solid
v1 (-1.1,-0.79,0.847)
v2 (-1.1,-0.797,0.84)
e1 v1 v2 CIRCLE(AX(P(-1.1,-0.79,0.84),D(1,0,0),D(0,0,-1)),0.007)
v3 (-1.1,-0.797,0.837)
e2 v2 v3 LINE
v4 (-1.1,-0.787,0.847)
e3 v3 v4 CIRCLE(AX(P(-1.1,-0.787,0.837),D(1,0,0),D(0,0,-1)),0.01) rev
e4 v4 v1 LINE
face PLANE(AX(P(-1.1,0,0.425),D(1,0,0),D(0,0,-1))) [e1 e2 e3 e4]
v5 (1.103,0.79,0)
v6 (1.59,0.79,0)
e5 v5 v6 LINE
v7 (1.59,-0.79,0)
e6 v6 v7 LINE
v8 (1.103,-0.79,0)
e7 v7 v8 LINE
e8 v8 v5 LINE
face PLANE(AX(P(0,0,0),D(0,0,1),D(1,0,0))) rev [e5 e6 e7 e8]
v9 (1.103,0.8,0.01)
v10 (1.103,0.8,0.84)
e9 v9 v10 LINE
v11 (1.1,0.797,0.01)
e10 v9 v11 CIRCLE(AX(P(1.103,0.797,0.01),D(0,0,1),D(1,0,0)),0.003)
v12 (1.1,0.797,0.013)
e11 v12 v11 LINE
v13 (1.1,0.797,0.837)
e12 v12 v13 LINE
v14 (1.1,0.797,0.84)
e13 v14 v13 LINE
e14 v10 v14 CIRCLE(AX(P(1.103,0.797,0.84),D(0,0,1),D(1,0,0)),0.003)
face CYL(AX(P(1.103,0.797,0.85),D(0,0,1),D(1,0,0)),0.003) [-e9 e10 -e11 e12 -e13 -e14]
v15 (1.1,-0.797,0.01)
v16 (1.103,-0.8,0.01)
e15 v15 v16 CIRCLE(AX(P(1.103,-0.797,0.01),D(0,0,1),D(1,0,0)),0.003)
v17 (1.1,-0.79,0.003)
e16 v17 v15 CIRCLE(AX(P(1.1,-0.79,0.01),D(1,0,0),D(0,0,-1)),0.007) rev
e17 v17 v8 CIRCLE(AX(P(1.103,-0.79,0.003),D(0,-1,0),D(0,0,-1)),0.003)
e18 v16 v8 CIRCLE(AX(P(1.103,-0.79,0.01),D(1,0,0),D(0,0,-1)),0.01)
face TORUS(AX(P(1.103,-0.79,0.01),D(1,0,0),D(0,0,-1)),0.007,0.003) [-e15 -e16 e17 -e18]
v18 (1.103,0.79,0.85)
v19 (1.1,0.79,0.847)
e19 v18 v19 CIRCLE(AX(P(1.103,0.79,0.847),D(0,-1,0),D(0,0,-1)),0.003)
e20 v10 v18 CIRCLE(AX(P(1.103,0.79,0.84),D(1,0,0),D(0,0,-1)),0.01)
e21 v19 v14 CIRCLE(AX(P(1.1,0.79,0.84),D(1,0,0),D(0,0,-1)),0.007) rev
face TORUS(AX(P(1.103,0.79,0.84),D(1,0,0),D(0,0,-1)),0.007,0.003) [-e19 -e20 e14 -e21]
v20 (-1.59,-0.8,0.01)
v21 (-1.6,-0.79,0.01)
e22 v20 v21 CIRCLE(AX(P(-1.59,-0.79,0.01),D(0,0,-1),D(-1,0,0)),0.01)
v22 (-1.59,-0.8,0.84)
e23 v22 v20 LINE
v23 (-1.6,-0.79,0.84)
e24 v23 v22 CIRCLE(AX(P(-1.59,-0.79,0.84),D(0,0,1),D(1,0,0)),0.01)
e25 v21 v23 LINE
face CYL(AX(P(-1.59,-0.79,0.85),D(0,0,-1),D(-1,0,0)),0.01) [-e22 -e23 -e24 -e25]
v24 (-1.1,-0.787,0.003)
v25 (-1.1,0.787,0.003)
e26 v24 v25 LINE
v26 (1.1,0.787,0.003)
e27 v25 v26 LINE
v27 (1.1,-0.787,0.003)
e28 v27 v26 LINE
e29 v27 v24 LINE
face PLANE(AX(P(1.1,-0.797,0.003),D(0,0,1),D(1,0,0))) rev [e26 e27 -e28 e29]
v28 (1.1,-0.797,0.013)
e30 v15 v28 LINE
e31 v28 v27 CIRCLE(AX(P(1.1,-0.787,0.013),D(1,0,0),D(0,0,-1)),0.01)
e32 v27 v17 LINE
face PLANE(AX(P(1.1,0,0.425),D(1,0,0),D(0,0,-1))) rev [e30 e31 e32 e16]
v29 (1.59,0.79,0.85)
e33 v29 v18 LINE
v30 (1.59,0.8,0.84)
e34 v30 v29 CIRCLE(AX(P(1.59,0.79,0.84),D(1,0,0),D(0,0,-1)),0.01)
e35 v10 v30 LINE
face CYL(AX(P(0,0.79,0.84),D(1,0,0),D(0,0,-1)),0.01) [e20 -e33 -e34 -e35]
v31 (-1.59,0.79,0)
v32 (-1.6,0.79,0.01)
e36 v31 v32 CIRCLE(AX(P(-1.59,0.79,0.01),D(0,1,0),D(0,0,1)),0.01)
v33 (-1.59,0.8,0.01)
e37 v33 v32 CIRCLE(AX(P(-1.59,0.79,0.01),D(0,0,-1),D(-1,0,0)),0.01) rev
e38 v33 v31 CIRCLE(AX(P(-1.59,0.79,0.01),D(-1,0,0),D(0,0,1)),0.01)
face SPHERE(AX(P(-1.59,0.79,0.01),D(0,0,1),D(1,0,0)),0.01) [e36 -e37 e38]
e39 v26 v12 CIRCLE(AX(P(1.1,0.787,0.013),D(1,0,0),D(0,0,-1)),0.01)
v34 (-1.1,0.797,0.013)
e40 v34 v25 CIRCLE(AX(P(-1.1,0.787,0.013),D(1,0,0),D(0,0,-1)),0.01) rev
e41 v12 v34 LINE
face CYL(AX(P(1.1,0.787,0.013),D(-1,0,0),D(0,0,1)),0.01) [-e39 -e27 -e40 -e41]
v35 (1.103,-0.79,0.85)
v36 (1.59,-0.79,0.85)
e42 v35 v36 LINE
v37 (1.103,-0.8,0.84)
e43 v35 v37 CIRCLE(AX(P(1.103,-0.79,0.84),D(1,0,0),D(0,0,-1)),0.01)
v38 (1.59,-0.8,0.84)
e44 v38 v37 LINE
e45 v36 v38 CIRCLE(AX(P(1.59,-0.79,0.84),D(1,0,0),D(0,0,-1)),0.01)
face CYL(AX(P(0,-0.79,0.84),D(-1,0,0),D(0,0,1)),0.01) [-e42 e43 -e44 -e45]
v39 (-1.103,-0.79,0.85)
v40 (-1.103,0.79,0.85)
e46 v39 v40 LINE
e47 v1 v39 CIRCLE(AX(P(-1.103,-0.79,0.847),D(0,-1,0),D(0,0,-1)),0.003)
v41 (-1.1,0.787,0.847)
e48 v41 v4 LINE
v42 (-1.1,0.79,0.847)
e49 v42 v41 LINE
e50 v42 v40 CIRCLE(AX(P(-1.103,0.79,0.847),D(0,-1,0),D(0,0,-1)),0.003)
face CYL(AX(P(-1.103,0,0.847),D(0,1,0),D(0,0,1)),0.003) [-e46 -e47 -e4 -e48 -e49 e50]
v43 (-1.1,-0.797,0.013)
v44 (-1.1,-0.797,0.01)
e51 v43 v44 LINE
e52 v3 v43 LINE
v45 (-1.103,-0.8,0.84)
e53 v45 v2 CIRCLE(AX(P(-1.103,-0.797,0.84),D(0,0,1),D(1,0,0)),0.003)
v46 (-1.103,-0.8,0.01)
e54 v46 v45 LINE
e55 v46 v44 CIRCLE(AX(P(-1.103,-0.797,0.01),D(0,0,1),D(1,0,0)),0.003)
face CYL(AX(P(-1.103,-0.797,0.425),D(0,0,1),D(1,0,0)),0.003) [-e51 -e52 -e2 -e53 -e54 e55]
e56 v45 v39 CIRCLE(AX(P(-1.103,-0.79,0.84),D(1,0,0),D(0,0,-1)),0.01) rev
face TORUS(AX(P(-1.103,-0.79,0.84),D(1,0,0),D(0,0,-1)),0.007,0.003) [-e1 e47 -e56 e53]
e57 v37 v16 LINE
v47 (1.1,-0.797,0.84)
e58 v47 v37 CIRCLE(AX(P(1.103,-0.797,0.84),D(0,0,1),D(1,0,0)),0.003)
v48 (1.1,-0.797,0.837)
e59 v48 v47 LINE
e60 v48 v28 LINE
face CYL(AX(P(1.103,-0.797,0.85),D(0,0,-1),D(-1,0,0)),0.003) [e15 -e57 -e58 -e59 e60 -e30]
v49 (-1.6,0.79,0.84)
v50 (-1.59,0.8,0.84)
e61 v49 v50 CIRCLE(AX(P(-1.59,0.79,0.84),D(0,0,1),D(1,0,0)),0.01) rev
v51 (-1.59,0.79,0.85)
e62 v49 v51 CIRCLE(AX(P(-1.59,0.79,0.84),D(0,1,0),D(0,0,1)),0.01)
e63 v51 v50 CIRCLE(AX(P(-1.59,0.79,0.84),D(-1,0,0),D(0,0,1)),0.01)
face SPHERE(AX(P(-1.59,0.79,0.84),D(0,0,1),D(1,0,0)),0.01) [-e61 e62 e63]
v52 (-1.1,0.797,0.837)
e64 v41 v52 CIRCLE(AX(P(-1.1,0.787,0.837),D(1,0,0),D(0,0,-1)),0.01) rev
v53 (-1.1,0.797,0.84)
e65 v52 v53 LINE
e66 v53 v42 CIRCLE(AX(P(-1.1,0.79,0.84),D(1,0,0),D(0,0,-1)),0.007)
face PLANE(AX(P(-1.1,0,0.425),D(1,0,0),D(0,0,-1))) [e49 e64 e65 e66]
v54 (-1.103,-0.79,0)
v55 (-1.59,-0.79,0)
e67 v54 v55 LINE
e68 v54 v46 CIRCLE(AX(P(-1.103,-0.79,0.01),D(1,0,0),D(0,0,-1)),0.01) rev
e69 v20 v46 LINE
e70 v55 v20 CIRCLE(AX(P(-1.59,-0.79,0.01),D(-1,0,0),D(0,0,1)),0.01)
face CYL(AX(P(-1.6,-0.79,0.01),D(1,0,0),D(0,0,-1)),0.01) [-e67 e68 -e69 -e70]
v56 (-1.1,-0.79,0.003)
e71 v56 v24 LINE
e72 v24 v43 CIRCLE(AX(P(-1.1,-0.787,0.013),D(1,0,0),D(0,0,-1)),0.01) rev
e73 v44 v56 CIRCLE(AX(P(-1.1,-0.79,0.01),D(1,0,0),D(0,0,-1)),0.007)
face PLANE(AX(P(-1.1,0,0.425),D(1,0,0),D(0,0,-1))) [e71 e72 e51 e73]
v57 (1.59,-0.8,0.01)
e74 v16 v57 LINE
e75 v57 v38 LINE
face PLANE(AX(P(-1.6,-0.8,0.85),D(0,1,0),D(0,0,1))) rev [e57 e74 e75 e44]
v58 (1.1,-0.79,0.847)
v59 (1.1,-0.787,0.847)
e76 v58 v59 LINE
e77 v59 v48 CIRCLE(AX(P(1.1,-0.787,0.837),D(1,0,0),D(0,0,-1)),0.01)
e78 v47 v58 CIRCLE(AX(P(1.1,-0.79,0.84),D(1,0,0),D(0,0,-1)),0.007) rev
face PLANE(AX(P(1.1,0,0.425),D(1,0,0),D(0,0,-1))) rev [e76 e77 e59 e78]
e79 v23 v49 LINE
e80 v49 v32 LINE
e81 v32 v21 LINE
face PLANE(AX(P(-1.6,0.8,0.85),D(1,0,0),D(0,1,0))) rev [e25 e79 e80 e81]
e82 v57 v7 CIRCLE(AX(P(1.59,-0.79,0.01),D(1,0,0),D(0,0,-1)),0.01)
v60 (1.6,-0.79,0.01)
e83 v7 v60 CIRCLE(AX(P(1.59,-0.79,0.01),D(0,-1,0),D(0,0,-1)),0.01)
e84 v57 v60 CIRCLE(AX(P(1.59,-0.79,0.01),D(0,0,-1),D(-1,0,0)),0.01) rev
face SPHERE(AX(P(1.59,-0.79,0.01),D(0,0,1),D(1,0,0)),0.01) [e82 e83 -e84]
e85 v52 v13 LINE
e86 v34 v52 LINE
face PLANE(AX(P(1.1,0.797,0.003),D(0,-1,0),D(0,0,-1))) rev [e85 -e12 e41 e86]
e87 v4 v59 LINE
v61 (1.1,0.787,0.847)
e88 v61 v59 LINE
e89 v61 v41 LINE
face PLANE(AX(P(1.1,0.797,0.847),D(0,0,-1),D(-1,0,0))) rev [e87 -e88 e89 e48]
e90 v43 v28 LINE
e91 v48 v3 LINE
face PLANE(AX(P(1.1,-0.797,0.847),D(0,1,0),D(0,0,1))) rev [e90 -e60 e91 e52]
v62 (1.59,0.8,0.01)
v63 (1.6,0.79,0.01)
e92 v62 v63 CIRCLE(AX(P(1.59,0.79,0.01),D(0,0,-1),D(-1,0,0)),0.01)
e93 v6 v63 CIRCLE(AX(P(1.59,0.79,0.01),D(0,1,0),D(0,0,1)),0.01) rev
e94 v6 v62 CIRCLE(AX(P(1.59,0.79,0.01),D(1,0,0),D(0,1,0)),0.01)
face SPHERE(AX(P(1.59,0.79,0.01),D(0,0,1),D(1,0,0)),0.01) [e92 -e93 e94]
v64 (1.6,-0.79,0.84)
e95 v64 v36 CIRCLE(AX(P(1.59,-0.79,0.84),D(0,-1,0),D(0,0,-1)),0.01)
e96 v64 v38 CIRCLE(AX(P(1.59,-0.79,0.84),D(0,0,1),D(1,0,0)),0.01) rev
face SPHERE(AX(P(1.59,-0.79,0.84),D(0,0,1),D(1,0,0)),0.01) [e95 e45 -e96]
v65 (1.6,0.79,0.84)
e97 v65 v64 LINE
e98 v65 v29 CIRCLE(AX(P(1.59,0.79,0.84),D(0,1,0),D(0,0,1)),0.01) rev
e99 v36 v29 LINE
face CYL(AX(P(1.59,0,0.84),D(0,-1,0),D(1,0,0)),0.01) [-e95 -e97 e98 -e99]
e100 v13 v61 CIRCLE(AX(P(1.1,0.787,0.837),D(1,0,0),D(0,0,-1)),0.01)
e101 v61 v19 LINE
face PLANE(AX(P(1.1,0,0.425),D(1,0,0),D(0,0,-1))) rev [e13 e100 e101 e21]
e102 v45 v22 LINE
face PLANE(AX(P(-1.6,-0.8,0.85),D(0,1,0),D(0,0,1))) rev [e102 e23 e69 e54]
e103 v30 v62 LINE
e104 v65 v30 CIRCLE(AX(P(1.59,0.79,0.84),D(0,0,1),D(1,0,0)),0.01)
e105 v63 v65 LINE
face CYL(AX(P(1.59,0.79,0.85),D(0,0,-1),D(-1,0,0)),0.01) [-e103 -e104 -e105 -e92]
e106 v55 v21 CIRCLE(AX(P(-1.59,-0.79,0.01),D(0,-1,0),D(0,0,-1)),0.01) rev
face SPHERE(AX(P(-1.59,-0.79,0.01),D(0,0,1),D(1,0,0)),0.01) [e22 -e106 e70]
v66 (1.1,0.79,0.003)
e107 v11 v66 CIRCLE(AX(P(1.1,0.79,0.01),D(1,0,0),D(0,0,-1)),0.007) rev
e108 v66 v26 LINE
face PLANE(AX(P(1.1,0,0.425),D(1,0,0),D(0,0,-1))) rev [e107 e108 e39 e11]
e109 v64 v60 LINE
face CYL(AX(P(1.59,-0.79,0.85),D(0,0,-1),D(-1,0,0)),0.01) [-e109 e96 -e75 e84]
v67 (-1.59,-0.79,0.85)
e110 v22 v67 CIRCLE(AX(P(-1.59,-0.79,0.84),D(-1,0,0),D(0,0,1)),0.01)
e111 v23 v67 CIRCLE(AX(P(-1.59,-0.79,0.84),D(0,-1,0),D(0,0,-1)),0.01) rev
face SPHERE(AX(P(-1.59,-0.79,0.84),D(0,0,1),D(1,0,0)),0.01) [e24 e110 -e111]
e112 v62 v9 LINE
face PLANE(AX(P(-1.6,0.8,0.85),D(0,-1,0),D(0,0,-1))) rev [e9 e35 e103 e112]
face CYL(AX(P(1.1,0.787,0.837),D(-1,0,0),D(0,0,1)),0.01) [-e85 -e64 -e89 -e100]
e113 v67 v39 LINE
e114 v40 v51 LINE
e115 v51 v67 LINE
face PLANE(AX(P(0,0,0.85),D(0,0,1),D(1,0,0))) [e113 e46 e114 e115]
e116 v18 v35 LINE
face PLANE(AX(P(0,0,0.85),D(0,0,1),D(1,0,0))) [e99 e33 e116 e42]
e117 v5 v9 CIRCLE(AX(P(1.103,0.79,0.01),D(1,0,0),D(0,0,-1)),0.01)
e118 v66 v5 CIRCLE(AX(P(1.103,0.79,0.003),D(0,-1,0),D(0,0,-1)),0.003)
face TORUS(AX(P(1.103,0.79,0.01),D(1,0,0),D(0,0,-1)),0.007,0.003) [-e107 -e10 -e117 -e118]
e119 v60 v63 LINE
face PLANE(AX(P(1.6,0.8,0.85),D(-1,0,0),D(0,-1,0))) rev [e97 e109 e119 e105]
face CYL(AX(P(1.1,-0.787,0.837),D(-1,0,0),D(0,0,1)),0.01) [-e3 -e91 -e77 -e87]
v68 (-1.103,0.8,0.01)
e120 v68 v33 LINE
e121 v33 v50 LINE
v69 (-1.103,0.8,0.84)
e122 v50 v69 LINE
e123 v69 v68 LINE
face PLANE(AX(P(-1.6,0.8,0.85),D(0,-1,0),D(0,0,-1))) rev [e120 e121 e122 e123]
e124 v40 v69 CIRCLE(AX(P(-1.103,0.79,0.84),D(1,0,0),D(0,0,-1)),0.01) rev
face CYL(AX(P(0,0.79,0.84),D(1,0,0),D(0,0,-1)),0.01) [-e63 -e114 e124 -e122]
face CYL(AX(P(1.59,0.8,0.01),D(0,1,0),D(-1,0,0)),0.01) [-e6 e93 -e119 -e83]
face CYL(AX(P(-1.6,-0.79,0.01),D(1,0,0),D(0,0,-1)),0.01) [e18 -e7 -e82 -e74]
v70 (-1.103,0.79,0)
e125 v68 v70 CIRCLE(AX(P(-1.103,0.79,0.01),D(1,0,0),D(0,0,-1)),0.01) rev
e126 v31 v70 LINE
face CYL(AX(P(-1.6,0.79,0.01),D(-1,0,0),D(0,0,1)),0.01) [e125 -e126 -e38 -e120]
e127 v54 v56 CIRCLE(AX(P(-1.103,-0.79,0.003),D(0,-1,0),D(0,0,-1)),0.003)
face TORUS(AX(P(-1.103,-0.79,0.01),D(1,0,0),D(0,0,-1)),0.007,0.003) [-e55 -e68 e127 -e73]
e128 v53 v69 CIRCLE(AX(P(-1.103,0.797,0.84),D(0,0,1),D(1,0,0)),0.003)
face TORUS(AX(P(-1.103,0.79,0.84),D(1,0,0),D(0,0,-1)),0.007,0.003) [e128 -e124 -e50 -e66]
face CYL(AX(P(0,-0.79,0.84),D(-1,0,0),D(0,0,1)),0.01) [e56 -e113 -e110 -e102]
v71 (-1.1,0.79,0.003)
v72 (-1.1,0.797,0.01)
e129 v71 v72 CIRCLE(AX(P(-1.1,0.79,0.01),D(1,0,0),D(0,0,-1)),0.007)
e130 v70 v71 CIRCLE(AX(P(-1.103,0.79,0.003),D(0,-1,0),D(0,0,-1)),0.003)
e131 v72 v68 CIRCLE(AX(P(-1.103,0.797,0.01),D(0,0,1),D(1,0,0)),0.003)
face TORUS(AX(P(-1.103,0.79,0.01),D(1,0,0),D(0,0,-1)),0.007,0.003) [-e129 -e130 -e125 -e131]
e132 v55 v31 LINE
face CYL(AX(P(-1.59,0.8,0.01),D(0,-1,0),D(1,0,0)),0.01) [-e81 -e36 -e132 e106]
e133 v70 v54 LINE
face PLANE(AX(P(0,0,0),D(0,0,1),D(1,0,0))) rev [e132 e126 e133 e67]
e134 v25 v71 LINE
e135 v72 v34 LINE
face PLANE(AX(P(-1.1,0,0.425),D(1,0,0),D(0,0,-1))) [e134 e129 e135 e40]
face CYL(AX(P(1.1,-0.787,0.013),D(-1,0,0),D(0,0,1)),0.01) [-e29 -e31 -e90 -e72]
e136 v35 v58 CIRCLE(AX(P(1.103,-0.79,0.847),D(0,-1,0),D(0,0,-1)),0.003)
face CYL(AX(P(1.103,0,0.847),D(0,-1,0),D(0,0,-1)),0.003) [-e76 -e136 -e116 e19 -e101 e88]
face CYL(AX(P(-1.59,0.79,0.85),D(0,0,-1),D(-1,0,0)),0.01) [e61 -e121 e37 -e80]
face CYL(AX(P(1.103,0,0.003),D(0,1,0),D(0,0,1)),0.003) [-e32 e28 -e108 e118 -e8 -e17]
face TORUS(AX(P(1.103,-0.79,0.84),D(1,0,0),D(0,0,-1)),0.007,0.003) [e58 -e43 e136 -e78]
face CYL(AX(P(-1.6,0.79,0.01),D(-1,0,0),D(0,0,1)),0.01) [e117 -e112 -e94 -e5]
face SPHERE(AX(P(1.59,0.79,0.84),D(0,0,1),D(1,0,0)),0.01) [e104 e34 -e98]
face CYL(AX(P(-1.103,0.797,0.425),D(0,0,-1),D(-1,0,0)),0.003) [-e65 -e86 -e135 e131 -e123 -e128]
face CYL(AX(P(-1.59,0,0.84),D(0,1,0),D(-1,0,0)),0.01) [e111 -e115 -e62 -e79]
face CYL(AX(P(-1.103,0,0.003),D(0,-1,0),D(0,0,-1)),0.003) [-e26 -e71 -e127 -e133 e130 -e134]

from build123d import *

# Parameters (mm, degrees)
SKETCH1_W                           = 3.2
SKETCH1_H                           = 1.6
ALL_BODY_DEPTH                      = 0.85
CUT_OUT_THE_BODY_FOR_PIN_DEPTH      = 1.1
CUT_OUT_THE_BODY_FOR_PIN_DEPTH_BACK = 1.1
SKETCH2_OUTSIDE_W                   = 3.586
SKETCH2_OUTSIDE_H                   = 4.336
SKETCH2_OUTSIDE_W_2                 = 0.844
SKETCH2_OUTSIDE_H_2                 = 1.594
BODY_FILLET_R                       = 0.01
PIN_FILLET_A_R                      = 0.01
PIN_FILLET_B_R                      = 0.003


with BuildPart() as part:
    # Sketch1 → All body (new body)
    with BuildSketch(Plane.XY):
        Rectangle(SKETCH1_W, SKETCH1_H)
    extrude(amount=ALL_BODY_DEPTH)

    # Sketch2 outside → Cut out the body for pin (cut, two sides: drawn at the far end of the back side and taken through both)
    with BuildSketch(Plane(origin=(0, 0, 0), x_dir=(0, 0, -1), z_dir=(1, 0, 0)).offset(-CUT_OUT_THE_BODY_FOR_PIN_DEPTH_BACK)):
        with Locations((-0.425, 0)):
            Rectangle(SKETCH2_OUTSIDE_W, SKETCH2_OUTSIDE_H)
        with Locations((-0.425, 0)):
            Rectangle(SKETCH2_OUTSIDE_W_2, SKETCH2_OUTSIDE_H_2, mode=Mode.SUBTRACT)
    extrude(amount=CUT_OUT_THE_BODY_FOR_PIN_DEPTH + CUT_OUT_THE_BODY_FOR_PIN_DEPTH_BACK, mode=Mode.SUBTRACT)

    # Body fillet
    body_fillet_edges = [part.edges().sort_by_distance(p)[0] for p in [
        (0, 0.797, 0.003),
        (0, 0.797, 0.847),
        (0, -0.797, 0.847),
        (0, -0.797, 0.003),
    ]]
    fillet(body_fillet_edges, radius=BODY_FILLET_R)

    # Pin fillet a
    pin_fillet_a_edges = [part.edges().sort_by_distance(p)[0] for p in [
        (1.6, 0, 0.85),
        (-1.35, 0.8, 0),
        (1.35, -0.8, 0),
        (1.35, -0.8, 0.85),
        (-1.35, 0.8, 0.85),
        (1.35, 0.8, 0.85),
        (-1.6, 0, 0.85),
        (1.35, 0.8, 0),
        (1.6, 0, 0),
        (-1.35, -0.8, 0),
        (-1.6, 0, 0),
        (-1.6, 0.8, 0.425),
        (1.6, 0.8, 0.425),
        (1.6, -0.8, 0.425),
        (-1.6, -0.8, 0.425),
        (-1.35, -0.8, 0.85),
    ]]
    fillet(pin_fillet_a_edges, radius=PIN_FILLET_A_R)

    # Pin fillet b
    pin_fillet_b_edges = [part.edges().sort_by_distance(p)[0] for p in [
        (1.1, -0.8, 0.425),
        (1.1, 0, 0.85),
        (1.1, 0.8, 0.425),
        (1.1, 0, 0),
        (-1.1, 0.8, 0.425),
        (-1.1, 0, 0.85),
        (-1.1, -0.8, 0.425),
        (-1.1, 0, 0),
        (1.1, 0.797071068, 0.002928932),
        (1.1, -0.797071068, 0.002928932),
        (1.1, -0.797071068, 0.847071068),
        (1.1, 0.797071068, 0.847071068),
        (-1.1, -0.797071068, 0.847071068),
        (-1.1, 0.797071068, 0.847071068),
        (-1.1, -0.797071068, 0.002928932),
        (-1.1, 0.797071068, 0.002928932),
    ]]
    fillet(pin_fillet_b_edges, radius=PIN_FILLET_B_R - 0.0001)  # a hair under: the kernel refuses the full size


solid = part.part
